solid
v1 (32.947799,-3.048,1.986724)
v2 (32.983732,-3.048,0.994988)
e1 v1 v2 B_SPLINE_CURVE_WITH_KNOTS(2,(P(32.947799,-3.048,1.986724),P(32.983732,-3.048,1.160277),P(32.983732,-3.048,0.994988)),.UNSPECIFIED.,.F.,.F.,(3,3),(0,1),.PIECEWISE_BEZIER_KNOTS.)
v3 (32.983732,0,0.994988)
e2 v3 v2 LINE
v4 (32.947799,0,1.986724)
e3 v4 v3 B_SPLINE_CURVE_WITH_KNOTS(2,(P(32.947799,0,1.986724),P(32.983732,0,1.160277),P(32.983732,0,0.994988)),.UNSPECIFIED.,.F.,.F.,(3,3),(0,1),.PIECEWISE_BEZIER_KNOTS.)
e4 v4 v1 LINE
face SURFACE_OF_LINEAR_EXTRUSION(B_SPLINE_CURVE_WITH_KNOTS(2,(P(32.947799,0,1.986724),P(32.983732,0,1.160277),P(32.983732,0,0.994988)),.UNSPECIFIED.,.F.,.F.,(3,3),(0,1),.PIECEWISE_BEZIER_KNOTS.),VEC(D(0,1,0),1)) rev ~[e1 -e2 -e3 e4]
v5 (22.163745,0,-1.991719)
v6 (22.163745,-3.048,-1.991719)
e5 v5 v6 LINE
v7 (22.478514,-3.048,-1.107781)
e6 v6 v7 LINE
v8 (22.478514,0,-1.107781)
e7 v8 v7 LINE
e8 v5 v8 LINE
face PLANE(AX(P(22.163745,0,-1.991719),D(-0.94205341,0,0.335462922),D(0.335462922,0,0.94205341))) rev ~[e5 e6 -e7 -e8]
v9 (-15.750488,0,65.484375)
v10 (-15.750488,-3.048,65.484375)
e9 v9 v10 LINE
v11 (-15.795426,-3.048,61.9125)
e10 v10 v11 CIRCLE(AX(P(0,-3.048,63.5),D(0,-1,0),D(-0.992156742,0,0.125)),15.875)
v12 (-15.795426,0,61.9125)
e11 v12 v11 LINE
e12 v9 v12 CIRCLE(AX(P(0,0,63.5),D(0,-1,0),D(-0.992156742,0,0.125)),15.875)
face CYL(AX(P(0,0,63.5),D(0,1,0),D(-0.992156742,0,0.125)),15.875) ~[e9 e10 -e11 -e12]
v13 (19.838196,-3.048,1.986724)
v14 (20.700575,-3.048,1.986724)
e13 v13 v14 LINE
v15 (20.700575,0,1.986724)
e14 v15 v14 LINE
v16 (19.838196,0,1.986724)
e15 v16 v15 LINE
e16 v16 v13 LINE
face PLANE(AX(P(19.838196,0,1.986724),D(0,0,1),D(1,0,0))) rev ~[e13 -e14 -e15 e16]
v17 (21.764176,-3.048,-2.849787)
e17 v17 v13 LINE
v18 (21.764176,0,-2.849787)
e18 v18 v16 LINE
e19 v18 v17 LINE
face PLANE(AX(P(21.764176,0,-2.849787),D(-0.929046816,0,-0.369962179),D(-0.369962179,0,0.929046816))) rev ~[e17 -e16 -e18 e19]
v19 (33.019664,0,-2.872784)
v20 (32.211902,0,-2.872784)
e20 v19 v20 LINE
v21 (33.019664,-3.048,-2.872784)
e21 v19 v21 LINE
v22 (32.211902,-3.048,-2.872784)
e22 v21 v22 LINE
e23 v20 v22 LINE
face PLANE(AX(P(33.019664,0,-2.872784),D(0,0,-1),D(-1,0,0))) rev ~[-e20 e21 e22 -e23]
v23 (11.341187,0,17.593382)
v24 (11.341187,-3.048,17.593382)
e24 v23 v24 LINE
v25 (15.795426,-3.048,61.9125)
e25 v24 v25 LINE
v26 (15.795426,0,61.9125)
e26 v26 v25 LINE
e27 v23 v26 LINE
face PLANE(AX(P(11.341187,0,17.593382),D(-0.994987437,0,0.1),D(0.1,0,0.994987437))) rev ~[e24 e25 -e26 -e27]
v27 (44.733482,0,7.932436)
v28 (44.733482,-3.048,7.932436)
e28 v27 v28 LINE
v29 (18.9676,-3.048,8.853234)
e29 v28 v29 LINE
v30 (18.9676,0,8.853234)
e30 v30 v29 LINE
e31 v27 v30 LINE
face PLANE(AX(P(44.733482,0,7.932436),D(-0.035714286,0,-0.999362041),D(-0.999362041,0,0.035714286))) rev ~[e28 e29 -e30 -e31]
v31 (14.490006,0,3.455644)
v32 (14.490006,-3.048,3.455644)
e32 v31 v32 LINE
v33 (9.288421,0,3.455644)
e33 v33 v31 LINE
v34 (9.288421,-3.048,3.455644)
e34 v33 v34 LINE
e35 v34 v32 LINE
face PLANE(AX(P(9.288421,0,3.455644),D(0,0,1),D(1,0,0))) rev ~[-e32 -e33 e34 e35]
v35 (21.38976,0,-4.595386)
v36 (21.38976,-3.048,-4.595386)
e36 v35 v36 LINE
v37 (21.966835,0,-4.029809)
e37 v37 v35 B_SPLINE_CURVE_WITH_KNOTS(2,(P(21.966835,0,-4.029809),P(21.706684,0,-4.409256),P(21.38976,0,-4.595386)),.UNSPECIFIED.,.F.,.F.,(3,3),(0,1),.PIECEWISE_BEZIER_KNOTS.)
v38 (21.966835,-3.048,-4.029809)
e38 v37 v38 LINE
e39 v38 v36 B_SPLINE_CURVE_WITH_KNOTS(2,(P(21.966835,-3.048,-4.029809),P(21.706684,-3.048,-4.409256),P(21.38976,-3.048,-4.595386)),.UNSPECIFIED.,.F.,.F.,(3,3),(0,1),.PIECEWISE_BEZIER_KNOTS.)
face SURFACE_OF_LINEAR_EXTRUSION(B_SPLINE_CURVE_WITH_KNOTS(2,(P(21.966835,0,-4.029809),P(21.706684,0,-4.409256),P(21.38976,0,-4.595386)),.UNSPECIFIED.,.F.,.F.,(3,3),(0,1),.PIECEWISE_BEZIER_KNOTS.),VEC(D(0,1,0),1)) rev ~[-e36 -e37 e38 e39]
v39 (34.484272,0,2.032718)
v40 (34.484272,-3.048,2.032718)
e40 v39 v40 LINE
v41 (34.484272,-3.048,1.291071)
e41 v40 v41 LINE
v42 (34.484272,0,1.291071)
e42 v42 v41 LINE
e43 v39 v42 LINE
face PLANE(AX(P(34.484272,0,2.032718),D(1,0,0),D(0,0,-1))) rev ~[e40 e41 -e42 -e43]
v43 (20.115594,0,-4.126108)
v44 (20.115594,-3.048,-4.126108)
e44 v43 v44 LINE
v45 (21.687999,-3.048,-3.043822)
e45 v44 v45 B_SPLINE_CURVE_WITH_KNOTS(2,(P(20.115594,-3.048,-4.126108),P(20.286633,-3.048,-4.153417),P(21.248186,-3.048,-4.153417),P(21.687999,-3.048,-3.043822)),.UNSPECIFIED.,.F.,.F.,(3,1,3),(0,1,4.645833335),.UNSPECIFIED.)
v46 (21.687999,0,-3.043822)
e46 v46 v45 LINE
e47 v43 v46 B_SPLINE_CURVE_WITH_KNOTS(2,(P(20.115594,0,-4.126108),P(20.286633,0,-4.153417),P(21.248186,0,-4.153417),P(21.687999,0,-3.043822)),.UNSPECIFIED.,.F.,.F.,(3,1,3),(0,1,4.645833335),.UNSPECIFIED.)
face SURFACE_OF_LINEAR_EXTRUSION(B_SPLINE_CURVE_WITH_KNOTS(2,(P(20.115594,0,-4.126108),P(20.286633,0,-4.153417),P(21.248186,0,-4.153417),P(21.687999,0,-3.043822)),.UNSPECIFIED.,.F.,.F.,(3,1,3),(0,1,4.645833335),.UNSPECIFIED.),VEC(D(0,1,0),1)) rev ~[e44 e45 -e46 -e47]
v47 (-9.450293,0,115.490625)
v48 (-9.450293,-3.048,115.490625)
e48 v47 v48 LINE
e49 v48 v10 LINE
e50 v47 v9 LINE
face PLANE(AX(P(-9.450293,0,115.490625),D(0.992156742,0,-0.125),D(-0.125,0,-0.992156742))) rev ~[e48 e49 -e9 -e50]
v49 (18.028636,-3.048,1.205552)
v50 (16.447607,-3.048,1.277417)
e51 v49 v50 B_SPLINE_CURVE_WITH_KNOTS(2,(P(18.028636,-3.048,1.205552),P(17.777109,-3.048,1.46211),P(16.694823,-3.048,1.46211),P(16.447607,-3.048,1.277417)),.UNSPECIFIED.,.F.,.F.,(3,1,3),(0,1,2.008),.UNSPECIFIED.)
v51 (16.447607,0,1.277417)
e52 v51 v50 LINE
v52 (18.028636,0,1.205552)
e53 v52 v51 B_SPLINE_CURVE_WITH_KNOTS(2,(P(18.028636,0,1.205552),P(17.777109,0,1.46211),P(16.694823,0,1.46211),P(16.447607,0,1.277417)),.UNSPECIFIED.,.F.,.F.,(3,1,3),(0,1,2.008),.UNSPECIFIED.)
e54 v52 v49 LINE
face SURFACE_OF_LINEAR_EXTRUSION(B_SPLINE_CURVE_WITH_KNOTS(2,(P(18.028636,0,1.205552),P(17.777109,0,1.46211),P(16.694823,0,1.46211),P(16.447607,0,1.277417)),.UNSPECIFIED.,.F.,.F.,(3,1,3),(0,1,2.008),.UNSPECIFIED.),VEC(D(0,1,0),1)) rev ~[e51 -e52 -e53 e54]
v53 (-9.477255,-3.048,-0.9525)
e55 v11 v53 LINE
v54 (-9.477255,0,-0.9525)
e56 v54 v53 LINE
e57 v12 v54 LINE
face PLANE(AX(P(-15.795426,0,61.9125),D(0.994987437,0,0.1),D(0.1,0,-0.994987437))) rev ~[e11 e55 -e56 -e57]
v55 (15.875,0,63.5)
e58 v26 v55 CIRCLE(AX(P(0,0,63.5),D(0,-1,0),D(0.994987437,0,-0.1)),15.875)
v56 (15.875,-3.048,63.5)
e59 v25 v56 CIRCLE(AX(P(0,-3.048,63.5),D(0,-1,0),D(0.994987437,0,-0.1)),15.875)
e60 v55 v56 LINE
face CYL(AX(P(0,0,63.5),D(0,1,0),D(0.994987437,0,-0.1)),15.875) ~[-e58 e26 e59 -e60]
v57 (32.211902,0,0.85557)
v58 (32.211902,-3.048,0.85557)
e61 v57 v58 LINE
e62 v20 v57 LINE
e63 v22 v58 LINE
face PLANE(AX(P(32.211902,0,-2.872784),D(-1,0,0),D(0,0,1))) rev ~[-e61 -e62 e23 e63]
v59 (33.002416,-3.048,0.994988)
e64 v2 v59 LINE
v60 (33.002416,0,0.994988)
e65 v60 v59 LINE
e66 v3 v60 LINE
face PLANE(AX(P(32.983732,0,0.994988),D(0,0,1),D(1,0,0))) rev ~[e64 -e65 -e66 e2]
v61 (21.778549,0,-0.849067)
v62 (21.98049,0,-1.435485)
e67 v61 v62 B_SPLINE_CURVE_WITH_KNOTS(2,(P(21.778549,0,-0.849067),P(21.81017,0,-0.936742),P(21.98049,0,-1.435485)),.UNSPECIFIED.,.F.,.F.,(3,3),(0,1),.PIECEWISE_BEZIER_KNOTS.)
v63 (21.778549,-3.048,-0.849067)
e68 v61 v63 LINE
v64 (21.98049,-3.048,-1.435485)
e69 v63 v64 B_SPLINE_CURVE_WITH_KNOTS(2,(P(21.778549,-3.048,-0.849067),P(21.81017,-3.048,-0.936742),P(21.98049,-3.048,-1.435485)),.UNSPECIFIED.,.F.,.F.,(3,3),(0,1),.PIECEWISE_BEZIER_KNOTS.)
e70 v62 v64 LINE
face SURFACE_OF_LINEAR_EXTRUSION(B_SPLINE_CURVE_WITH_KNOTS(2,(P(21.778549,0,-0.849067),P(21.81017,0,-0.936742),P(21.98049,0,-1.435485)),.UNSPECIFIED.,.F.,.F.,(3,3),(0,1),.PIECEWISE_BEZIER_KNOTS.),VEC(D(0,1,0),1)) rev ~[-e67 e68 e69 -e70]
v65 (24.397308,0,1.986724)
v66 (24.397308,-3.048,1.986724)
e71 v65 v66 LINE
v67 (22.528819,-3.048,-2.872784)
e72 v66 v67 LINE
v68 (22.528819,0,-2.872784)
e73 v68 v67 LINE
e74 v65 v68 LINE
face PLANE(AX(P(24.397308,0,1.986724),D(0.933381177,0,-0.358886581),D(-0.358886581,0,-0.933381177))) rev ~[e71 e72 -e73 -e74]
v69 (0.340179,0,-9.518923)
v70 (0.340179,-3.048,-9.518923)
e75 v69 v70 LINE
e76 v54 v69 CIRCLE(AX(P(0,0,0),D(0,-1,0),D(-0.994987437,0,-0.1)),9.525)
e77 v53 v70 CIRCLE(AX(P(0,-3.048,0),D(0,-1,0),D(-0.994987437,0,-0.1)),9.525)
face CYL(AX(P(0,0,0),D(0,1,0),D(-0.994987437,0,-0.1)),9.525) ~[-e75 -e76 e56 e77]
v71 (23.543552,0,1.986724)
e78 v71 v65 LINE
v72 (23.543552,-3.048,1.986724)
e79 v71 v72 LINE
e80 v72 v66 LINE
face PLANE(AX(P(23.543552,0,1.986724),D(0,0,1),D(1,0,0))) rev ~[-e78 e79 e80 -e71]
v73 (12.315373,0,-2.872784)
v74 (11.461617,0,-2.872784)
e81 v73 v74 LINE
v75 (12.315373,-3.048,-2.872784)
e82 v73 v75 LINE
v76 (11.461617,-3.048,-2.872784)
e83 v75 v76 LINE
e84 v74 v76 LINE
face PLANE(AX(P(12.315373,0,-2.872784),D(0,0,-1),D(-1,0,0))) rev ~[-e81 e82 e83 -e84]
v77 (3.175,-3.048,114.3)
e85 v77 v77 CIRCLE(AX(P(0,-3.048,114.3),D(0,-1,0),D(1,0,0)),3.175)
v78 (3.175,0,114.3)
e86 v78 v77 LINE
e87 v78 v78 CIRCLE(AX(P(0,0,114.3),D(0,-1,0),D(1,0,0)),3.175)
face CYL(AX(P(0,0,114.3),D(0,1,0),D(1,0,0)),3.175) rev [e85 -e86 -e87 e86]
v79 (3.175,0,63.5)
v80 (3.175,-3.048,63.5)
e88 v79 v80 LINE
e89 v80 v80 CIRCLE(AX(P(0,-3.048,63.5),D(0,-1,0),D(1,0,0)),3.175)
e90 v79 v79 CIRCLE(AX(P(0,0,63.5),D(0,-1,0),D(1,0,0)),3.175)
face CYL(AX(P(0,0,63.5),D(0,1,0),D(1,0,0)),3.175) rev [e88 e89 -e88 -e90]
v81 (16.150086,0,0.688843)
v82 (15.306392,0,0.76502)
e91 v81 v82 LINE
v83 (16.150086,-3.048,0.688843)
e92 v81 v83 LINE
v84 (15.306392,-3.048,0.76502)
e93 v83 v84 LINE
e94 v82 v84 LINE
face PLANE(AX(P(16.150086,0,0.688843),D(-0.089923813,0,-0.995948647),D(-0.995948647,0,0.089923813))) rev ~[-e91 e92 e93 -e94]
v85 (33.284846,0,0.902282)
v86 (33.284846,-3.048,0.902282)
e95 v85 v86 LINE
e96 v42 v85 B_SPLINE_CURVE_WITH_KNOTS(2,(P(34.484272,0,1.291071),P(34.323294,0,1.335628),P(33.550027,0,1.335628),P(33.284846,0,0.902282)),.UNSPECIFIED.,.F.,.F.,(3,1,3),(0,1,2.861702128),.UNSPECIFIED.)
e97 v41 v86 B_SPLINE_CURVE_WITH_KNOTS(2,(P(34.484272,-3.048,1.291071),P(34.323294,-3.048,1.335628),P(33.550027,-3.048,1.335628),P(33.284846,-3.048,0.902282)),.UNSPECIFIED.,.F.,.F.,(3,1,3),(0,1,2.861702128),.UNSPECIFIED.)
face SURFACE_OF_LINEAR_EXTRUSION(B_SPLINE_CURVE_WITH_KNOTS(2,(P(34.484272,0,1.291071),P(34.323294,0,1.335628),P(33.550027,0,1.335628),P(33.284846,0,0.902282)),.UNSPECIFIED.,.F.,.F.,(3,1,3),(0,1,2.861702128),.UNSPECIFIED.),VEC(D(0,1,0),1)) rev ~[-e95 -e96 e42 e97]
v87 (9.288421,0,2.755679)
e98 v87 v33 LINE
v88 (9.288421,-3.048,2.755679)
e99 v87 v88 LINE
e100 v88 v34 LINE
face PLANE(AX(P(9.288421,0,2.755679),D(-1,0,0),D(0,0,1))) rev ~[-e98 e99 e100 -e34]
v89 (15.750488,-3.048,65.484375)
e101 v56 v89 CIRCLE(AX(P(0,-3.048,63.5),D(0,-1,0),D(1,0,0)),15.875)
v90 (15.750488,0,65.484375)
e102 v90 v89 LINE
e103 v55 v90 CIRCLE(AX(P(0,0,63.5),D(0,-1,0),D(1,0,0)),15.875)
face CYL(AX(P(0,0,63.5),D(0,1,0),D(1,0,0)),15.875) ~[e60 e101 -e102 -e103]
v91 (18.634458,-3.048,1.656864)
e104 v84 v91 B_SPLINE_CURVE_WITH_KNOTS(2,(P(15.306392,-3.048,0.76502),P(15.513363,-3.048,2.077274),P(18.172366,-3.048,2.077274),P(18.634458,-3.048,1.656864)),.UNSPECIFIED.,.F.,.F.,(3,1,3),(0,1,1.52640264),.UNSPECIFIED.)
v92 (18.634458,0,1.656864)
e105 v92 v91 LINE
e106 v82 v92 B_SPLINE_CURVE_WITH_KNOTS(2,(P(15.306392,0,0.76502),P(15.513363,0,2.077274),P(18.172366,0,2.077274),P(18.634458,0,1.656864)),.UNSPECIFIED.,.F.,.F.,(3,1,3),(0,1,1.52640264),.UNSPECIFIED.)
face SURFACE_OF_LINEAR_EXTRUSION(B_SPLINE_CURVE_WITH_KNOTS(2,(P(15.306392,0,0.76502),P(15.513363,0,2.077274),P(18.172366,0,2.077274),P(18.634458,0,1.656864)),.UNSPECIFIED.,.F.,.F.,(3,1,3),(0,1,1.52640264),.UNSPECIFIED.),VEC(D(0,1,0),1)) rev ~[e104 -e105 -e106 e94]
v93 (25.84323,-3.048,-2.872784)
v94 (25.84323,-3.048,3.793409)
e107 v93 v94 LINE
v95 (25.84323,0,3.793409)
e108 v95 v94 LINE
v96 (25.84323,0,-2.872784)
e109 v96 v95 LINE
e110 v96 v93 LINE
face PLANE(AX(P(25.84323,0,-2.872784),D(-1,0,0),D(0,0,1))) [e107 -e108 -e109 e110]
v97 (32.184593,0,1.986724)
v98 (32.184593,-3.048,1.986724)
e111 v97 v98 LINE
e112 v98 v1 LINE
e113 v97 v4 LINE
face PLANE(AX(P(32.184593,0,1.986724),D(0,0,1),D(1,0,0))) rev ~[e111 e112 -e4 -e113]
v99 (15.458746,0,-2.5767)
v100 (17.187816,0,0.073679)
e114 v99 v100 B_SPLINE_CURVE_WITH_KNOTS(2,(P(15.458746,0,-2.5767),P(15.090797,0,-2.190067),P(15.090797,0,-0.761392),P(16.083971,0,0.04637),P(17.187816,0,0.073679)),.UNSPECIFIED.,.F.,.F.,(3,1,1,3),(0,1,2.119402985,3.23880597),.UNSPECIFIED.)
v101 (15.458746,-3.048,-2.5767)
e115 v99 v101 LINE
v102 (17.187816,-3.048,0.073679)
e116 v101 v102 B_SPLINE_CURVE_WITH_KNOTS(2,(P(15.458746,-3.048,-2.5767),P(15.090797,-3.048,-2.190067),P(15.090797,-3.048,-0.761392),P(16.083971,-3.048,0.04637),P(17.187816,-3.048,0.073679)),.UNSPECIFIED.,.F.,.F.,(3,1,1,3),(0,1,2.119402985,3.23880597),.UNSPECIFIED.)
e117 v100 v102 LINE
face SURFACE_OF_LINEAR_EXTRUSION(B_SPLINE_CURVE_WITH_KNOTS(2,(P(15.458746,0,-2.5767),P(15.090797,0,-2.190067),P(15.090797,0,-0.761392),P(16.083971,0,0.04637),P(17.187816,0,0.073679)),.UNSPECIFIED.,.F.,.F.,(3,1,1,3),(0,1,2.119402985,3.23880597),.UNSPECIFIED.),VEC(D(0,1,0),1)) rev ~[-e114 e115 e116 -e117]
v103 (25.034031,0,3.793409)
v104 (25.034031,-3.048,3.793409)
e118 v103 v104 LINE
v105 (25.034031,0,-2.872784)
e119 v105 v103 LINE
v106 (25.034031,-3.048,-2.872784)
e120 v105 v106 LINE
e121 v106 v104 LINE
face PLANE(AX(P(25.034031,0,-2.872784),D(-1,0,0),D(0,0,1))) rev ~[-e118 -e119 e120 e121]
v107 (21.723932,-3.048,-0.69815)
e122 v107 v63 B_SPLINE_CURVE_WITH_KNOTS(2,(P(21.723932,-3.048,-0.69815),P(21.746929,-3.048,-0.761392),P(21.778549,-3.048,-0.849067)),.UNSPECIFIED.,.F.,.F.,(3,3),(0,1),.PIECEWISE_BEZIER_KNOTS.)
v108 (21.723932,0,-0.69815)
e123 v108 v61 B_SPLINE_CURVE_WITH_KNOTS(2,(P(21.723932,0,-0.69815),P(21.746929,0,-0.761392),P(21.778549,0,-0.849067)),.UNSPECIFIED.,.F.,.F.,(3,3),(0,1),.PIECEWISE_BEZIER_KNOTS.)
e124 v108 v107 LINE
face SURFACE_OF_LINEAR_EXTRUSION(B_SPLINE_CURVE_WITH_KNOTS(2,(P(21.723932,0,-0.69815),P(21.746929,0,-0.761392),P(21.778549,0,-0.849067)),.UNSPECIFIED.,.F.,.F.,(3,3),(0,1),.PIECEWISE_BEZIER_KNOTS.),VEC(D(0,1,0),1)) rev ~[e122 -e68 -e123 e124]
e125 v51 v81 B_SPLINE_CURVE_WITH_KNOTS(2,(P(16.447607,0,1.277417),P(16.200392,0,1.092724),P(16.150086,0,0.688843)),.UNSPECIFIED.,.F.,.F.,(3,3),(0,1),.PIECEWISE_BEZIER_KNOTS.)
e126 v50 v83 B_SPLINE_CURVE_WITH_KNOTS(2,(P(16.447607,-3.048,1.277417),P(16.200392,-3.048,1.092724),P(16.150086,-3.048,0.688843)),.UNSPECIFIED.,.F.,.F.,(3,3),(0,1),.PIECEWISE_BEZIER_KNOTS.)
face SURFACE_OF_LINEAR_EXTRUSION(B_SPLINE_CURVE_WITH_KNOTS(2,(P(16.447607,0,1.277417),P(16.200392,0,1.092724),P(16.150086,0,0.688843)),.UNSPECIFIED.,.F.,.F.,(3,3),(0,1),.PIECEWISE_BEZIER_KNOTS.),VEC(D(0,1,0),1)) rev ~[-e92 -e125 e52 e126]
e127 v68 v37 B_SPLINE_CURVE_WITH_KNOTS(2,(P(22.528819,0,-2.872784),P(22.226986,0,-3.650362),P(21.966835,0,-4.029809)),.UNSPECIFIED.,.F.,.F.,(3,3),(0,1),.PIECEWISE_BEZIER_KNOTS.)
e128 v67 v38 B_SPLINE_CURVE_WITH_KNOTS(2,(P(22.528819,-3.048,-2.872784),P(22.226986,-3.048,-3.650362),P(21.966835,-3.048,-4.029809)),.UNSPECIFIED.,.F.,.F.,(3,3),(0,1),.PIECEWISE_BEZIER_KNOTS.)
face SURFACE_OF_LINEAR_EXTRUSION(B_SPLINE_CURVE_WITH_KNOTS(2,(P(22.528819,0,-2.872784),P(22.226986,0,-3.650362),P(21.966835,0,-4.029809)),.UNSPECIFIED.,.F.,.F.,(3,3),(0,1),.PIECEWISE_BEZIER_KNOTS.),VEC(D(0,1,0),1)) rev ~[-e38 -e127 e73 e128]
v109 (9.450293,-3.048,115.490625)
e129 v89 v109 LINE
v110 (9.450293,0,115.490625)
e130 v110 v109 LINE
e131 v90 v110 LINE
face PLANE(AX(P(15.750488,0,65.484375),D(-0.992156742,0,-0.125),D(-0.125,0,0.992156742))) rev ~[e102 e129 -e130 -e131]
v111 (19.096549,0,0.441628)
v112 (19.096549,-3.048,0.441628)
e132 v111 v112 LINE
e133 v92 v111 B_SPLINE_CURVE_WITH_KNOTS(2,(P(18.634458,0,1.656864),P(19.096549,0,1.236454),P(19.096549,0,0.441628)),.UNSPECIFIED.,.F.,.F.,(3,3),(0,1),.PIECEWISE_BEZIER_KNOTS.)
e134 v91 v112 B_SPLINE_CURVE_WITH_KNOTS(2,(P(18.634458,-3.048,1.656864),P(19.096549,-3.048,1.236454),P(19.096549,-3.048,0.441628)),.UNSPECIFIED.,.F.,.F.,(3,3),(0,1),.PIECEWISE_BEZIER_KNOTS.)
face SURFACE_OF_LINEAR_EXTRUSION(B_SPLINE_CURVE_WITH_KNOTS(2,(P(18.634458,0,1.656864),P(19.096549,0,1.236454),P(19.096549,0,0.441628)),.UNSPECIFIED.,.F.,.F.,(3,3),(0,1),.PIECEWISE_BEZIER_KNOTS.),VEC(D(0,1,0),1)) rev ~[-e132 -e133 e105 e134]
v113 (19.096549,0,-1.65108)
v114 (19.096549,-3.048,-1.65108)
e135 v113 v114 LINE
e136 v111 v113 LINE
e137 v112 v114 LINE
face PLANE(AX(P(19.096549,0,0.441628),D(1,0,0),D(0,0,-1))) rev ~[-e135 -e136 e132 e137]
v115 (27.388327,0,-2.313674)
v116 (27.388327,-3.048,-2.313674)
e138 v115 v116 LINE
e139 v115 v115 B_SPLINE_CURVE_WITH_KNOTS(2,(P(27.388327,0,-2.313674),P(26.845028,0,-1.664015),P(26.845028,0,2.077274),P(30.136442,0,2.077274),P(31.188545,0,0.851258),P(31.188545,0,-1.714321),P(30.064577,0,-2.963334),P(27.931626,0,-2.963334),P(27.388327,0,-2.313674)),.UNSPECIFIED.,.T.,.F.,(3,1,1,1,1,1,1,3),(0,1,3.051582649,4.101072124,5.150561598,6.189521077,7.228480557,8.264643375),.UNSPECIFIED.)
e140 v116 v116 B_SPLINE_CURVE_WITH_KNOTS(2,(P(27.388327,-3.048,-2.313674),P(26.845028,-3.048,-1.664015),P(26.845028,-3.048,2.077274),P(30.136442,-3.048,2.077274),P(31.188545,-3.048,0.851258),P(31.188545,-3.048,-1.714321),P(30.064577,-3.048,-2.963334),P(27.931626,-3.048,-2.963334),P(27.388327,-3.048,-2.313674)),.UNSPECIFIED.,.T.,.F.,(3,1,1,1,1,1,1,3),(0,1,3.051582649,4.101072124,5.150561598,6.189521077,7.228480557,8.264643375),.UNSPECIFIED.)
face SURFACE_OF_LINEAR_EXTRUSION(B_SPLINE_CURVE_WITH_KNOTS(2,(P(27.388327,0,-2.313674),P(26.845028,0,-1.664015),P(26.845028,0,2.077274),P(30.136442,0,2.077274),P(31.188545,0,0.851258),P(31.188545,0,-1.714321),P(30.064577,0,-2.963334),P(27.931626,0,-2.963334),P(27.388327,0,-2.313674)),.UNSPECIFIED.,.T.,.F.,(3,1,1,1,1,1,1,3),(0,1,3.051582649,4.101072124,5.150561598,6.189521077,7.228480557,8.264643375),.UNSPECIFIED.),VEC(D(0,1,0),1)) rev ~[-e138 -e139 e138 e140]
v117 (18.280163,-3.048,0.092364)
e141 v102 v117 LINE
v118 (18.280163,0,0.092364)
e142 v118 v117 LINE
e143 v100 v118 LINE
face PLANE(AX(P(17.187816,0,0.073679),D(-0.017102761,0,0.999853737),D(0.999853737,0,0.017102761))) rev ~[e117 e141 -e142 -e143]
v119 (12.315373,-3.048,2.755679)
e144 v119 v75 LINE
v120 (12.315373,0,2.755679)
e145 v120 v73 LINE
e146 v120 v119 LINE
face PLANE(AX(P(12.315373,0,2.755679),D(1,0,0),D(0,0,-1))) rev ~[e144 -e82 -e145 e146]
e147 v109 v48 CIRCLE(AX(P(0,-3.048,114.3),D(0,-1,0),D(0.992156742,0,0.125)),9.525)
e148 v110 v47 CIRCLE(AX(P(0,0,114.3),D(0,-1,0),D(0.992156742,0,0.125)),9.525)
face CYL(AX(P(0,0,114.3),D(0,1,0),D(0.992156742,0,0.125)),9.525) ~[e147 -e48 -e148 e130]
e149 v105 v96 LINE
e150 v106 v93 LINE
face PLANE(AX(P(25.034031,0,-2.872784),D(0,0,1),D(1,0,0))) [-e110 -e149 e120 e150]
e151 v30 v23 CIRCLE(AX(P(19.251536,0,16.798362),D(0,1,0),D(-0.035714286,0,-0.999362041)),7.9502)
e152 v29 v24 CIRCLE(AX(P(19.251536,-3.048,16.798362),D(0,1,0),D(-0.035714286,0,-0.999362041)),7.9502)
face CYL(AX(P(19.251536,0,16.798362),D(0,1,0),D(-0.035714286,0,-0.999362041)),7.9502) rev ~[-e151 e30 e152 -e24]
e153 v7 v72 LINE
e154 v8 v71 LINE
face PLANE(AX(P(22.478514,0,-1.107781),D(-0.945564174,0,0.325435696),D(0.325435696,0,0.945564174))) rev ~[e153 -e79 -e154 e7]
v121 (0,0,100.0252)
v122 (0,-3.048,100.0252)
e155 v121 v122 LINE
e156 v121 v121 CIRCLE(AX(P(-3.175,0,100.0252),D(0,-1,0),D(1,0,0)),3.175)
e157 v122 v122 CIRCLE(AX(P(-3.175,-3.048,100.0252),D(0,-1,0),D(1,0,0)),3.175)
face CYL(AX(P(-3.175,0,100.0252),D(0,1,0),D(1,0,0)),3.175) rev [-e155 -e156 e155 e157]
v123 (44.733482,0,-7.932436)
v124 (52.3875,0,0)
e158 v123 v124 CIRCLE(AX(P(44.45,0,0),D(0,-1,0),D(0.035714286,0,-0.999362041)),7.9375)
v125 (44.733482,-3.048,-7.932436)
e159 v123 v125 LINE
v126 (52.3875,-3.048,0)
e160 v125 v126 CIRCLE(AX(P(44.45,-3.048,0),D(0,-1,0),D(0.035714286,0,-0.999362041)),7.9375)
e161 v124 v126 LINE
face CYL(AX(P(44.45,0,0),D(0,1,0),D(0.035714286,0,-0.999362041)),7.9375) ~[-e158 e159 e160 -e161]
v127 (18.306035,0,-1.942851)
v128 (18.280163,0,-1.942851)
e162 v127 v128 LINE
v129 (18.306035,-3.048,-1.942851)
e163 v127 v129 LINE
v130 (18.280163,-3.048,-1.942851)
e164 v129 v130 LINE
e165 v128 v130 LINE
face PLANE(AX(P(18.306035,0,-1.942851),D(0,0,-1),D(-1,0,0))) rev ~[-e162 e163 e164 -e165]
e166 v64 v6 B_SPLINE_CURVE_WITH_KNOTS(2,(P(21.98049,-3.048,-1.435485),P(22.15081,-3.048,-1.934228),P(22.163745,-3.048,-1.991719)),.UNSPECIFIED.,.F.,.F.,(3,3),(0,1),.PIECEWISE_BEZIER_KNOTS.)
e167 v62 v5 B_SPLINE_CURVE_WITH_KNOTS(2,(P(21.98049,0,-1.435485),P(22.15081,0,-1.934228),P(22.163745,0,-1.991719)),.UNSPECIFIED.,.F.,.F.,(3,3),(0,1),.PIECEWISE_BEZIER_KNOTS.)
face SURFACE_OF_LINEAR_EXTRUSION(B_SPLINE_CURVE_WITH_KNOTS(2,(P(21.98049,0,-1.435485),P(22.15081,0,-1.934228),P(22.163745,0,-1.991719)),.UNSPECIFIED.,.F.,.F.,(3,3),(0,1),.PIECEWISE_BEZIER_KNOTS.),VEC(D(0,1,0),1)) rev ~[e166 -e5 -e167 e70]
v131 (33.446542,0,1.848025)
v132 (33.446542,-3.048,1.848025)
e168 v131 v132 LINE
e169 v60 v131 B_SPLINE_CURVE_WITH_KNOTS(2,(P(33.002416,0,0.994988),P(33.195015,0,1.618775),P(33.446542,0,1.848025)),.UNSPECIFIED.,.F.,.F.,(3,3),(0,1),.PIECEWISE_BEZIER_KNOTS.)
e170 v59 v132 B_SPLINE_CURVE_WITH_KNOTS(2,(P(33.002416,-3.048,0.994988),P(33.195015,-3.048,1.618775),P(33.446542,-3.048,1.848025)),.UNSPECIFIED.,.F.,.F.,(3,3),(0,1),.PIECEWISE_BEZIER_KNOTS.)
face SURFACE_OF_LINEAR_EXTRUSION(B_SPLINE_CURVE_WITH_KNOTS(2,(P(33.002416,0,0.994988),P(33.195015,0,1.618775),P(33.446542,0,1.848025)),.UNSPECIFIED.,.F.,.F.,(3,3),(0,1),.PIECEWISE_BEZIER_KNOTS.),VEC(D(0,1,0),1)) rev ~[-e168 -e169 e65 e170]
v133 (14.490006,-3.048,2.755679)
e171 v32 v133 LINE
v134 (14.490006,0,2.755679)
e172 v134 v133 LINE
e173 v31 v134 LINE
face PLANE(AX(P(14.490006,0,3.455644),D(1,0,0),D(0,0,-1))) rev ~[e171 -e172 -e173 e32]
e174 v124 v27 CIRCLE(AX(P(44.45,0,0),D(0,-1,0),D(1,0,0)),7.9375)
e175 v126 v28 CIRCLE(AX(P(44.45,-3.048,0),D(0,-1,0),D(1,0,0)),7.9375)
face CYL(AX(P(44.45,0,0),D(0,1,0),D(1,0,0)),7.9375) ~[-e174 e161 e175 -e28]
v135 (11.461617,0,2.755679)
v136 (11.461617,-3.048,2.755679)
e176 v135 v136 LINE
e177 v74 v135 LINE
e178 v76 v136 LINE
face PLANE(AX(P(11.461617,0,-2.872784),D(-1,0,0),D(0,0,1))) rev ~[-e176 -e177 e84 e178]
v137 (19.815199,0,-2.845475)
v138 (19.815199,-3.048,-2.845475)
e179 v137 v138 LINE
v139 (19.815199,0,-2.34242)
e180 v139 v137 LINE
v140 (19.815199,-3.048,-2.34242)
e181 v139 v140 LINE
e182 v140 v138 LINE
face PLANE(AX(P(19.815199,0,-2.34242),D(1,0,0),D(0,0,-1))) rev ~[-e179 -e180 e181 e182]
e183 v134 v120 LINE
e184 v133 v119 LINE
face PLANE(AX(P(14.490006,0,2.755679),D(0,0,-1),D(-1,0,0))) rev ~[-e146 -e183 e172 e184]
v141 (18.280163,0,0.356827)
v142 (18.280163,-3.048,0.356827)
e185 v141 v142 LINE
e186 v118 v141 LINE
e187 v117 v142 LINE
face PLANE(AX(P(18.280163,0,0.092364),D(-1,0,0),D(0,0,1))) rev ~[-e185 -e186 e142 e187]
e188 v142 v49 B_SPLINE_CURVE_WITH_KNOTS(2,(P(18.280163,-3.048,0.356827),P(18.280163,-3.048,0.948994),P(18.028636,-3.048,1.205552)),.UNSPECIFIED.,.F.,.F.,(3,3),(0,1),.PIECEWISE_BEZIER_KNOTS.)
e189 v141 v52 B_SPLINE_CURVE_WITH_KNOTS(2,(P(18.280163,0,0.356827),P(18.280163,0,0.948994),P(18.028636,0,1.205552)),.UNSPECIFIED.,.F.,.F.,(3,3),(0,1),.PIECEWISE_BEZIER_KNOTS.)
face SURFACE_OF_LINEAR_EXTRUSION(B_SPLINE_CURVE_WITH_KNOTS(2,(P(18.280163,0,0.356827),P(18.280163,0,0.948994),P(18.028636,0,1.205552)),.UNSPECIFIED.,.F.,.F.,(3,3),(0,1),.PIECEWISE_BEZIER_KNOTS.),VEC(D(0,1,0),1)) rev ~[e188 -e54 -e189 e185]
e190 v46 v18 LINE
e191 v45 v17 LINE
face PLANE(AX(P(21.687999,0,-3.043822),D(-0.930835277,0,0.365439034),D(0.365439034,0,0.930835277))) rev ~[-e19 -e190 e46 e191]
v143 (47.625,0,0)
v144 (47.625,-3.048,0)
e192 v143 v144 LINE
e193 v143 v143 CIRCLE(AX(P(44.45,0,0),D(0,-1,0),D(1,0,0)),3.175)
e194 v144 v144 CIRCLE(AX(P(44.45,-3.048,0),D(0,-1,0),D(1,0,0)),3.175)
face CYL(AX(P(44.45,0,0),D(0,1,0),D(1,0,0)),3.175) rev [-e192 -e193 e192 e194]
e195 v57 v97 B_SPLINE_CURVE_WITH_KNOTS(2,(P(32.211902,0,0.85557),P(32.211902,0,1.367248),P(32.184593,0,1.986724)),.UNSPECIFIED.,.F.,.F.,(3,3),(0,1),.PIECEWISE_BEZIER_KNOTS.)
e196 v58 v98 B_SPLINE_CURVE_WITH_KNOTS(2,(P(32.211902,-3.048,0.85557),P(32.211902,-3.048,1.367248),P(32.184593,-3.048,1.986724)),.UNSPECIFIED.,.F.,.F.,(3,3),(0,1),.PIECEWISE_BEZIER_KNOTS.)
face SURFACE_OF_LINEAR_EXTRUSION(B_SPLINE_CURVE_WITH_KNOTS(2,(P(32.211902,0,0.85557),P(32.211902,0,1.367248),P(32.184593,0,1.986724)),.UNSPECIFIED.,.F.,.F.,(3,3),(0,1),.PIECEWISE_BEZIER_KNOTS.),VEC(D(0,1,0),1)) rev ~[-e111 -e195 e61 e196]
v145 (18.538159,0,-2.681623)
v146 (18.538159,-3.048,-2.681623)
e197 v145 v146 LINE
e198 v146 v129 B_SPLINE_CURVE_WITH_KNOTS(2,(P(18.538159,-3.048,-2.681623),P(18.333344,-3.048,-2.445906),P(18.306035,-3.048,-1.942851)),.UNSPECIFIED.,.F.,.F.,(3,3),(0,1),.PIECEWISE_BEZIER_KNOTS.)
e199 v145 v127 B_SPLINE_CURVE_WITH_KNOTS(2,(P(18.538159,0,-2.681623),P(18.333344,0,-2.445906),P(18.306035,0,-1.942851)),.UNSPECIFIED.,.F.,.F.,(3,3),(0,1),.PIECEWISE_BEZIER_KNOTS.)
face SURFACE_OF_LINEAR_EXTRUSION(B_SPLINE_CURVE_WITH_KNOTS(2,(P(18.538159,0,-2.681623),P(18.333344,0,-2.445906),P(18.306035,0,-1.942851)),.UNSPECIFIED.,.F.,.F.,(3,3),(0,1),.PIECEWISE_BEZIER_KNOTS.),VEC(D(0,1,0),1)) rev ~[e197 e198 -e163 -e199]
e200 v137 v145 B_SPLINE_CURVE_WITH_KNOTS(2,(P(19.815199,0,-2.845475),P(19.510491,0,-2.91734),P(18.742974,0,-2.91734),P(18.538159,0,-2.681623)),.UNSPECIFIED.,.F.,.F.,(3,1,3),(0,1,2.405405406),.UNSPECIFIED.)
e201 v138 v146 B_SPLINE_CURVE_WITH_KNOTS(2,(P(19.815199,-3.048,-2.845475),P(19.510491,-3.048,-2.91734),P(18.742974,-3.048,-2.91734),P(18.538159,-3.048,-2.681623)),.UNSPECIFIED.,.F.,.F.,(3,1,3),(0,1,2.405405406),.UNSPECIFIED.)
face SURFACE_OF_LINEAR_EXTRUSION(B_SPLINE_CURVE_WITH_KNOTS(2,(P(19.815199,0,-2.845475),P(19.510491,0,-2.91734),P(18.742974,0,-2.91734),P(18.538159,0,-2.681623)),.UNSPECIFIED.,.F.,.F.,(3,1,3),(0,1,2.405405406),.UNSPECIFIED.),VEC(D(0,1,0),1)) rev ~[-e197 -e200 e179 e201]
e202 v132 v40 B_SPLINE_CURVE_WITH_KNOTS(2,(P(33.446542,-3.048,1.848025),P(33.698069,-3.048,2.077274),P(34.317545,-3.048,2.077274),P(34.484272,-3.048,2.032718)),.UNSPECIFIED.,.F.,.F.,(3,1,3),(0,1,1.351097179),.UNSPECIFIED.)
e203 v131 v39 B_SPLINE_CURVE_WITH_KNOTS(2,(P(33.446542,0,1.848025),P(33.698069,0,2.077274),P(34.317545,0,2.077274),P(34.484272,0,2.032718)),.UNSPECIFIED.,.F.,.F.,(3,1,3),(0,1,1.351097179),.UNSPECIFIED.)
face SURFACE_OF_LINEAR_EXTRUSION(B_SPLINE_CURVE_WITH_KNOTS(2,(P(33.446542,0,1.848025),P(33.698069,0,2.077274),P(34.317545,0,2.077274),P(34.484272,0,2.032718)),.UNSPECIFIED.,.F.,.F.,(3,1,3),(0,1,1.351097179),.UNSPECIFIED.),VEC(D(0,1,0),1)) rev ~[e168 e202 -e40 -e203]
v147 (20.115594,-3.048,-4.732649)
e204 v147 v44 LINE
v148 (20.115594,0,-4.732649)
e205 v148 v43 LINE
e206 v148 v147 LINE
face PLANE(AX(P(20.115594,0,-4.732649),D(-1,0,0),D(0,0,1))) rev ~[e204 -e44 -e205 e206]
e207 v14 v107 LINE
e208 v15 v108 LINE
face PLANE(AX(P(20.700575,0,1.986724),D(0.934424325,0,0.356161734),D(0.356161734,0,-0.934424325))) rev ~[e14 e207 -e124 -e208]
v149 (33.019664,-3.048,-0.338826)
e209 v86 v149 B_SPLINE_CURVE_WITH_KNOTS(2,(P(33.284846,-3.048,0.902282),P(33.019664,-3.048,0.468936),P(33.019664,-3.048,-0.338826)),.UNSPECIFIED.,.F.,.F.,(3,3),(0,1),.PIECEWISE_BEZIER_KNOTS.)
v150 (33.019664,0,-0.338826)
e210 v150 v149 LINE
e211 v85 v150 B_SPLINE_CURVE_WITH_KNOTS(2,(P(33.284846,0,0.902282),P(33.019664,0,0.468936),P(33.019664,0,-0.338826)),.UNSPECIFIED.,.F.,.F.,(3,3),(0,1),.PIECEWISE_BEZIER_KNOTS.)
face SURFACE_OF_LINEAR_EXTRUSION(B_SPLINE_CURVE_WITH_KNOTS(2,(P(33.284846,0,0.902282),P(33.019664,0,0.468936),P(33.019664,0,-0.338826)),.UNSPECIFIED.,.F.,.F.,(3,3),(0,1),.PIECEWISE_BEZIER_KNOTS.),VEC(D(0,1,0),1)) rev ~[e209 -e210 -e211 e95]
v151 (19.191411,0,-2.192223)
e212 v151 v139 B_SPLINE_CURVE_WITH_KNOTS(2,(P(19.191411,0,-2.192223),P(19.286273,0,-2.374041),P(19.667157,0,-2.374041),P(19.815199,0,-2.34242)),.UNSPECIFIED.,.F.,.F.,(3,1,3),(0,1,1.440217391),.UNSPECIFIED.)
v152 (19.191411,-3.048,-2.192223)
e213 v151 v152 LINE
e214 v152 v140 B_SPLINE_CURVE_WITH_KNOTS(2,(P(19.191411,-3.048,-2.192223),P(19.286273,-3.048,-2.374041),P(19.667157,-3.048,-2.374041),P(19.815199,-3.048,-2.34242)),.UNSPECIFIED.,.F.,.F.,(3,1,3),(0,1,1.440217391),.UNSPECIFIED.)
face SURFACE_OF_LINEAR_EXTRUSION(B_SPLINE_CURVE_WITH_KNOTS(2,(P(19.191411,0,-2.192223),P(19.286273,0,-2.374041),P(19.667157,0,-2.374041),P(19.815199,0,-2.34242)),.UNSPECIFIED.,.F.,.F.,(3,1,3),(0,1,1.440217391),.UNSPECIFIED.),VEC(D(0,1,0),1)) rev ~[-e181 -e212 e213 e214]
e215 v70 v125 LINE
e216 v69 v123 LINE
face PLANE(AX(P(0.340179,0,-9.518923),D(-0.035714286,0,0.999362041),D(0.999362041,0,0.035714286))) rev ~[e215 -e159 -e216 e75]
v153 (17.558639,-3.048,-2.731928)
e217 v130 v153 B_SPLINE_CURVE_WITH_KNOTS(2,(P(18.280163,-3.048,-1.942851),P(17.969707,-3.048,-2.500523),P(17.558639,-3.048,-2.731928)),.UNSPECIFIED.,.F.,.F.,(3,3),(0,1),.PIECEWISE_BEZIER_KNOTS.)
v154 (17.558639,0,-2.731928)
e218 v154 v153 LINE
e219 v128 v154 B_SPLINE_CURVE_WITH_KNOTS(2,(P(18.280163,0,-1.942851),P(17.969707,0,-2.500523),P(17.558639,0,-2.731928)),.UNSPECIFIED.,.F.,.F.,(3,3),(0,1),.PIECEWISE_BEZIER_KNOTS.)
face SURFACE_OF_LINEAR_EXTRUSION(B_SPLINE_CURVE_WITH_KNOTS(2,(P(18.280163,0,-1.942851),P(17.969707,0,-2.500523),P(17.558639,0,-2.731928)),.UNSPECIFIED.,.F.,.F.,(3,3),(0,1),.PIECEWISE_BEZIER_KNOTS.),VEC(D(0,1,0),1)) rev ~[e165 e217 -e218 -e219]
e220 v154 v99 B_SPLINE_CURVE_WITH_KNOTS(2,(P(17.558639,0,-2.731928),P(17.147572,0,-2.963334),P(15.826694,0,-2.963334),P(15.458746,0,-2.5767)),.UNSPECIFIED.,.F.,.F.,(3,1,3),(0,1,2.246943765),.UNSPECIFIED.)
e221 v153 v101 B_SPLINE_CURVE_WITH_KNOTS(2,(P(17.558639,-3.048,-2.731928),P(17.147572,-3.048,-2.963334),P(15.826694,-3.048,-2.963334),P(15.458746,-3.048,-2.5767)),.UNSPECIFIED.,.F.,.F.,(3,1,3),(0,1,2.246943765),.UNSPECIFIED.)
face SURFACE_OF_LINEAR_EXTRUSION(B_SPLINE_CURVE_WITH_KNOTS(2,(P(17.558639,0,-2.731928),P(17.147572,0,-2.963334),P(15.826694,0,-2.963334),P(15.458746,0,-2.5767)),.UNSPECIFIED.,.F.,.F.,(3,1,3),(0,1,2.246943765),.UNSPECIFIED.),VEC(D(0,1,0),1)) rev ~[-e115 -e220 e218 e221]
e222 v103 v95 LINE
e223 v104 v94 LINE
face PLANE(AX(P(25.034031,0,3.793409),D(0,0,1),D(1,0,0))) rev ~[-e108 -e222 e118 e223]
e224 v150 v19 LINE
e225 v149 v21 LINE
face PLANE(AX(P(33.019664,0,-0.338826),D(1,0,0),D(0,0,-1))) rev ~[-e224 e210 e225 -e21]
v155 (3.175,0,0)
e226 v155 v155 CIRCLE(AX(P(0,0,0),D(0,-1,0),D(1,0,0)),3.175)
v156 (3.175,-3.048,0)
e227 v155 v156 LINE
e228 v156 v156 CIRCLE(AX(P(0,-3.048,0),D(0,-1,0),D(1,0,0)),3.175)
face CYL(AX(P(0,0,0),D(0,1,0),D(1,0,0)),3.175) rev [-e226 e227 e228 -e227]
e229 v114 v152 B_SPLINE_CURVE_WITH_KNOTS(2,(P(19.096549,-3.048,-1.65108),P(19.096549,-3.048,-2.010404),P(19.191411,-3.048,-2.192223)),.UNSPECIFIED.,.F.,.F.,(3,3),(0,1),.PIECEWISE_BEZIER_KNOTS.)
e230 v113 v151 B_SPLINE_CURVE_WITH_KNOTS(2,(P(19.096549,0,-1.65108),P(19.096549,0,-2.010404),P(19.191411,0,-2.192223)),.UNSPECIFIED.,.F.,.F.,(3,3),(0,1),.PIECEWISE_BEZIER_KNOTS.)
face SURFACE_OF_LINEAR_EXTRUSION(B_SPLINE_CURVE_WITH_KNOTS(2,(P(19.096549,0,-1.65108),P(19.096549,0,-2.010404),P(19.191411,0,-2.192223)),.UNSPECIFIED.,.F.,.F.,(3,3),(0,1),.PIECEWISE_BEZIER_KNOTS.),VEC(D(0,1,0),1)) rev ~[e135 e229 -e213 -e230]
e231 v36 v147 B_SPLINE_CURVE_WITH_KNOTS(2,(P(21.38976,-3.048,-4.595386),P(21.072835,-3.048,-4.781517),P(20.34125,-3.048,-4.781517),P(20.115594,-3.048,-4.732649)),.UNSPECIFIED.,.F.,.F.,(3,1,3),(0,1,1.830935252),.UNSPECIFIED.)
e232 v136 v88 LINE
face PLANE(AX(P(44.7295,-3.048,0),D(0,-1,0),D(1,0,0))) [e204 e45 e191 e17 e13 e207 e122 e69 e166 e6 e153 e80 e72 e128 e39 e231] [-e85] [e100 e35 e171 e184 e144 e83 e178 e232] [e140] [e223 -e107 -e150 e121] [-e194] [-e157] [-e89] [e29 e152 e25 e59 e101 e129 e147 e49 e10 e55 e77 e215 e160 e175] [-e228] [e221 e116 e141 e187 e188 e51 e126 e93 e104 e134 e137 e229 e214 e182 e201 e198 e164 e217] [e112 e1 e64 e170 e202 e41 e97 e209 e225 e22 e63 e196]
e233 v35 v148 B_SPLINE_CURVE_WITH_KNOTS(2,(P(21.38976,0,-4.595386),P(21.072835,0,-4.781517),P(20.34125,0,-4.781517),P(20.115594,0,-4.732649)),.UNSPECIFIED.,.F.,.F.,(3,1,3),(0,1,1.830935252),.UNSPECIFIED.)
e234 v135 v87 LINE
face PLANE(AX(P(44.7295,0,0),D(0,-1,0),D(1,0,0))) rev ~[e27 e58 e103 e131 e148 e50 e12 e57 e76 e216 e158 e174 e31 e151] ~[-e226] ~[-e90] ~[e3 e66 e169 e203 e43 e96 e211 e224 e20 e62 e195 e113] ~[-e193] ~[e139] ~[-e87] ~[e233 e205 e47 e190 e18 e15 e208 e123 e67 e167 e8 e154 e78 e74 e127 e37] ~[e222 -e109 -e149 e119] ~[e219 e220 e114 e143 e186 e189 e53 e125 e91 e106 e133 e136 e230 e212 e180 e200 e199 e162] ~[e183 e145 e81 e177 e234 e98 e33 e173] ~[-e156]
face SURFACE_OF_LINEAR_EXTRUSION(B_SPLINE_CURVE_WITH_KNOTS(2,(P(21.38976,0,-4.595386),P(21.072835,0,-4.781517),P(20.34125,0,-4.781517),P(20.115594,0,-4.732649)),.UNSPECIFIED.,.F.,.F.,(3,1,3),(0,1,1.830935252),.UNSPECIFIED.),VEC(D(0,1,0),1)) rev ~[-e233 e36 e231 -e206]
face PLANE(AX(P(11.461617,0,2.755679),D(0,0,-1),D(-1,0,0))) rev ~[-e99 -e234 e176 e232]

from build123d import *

# Parameters (mm, degrees)
F0_R     = 3.175
F0_W     = 0.8091993024
F0_H     = 6.6661924771
F1_DEPTH = 3.048


with BuildPart() as f1:
    # F0 (on Front) → F1 (new body)
    with BuildSketch(Plane.XZ):
        with BuildLine():
            ThreePointArc((44.7334821429, -7.9324362036), (50.1620069047, -5.5115227815), (52.3875, 0))
            ThreePointArc((52.3875, 0), (50.1620069047, 5.5115227815), (44.7334821429, 7.9324362036))
            ThreePointArc((44.7334821429, 7.9324362036), (36.5125, 0), (44.7334821429, -7.9324362036))
        make_face()
        with Locations((44.45, 0)):
            Circle(F0_R, mode=Mode.SUBTRACT)
        with BuildLine():
            ThreePointArc((44.7334821429, -7.9324362036), (36.5125, 0), (44.7334821429, 7.9324362036))
            Line((44.7334821429, 7.9324362036), (18.9676000005, 8.8532337108))
            ThreePointArc((18.9676000005, 8.8532337108), (13.2611998974, 11.5713591498), (11.3411865923, 17.5933818124))
            Line((11.3411865923, 17.5933818124), (15.7954255641, 61.9125))
            ThreePointArc((15.7954255641, 61.9125), (0, 47.625), (-15.7954255641, 61.9125))
            Line((-15.7954255641, 61.9125), (-9.4772553384, -0.9525))
            ThreePointArc((-9.4772553384, -0.9525), (-0.4768479324, 9.5130563464), (9.525, 0))
            ThreePointArc((9.525, 0), (6.8544082857, -6.6138273378), (0.3401785714, -9.5189234444))
            Line((0.3401785714, -9.5189234444), (44.7334821429, -7.9324362036))
        make_face()
        Polygon((14.4900061593, 2.7556789248), (12.3153728652, 2.7556789248), (12.3153728652, -2.8727837186), (11.4616172957, -2.8727837186), (11.4616172957, 2.7556789248), (9.2884213006, 2.7556789248), (9.2884213006, 3.4556435079), (14.4900061593, 3.4556435079), align=None, mode=Mode.SUBTRACT)
        with BuildLine():
            add(Edge.make_bspline(
                [(17.5586393932, -2.7319284226), (17.1475718967, -2.9633335517), (16.5597166308, -2.9633335517)],
                knots=[0, 0, 0, 1, 1, 1], degree=2))
            add(Edge.make_bspline(
                [(16.5597166308, -2.9633335517), (15.8266941722, -2.9633335517), (15.4587456439, -2.5767001373)],
                knots=[0, 0, 0, 1, 1, 1], degree=2))
            add(Edge.make_bspline(
                [(15.4587456439, -2.5767001373), (15.0907971156, -2.1900667228), (15.0907971156, -1.5159735206)],
                knots=[0, 0, 0, 1, 1, 1], degree=2))
            add(Edge.make_bspline(
                [(15.0907971156, -1.5159735206), (15.0907971156, -0.7613915778), (15.5873838989, -0.3575105761)],
                knots=[0, 0, 0, 1, 1, 1], degree=2))
            add(Edge.make_bspline(
                [(15.5873838989, -0.3575105761), (16.0839706822, 0.0463704256), (17.187816267, 0.0736791055)],
                knots=[0, 0, 0, 1, 1, 1], degree=2))
            Line((17.187816267, 0.0736791055), (18.2801634603, 0.0923639917))
            Line((18.2801634603, 0.0923639917), (18.2801634603, 0.3568269964))
            add(Edge.make_bspline(
                [(18.2801634603, 0.3568269964), (18.2801634603, 0.9489941591), (18.0286361461, 1.2055520196)],
                knots=[0, 0, 0, 1, 1, 1], degree=2))
            add(Edge.make_bspline(
                [(18.0286361461, 1.2055520196), (17.7771088318, 1.4621098801), (17.2381217298, 1.4621098801)],
                knots=[0, 0, 0, 1, 1, 1], degree=2))
            add(Edge.make_bspline(
                [(17.2381217298, 1.4621098801), (16.6948227311, 1.4621098801), (16.4476073136, 1.2774169665)],
                knots=[0, 0, 0, 1, 1, 1], degree=2))
            add(Edge.make_bspline(
                [(16.4476073136, 1.2774169665), (16.2003918962, 1.0927240529), (16.1500864334, 0.6888430512)],
                knots=[0, 0, 0, 1, 1, 1], degree=2))
            Line((16.1500864334, 0.6888430512), (15.3063919564, 0.7650198949))
            add(Edge.make_bspline(
                [(15.3063919564, 0.7650198949), (15.5133630036, 2.0772738258), (17.2553693171, 2.0772738258)],
                knots=[0, 0, 0, 1, 1, 1], degree=2))
            add(Edge.make_bspline(
                [(17.2553693171, 2.0772738258), (18.1723660399, 2.0772738258), (18.6344576487, 1.6568638863)],
                knots=[0, 0, 0, 1, 1, 1], degree=2))
            add(Edge.make_bspline(
                [(18.6344576487, 1.6568638863), (19.0965492574, 1.2364539468), (19.0965492574, 0.4416276337)],
                knots=[0, 0, 0, 1, 1, 1], degree=2))
            Line((19.0965492574, 0.4416276337), (19.0965492574, -1.6510796208))
            add(Edge.make_bspline(
                [(19.0965492574, -1.6510796208), (19.0965492574, -2.0104043555), (19.1914109874, -2.1922226712)],
                knots=[0, 0, 0, 1, 1, 1], degree=2))
            add(Edge.make_bspline(
                [(19.1914109874, -2.1922226712), (19.2862727173, -2.3740409869), (19.550735722, -2.3740409869)],
                knots=[0, 0, 0, 1, 1, 1], degree=2))
            add(Edge.make_bspline(
                [(19.550735722, -2.3740409869), (19.667156936, -2.3740409869), (19.8151987267, -2.3424204103)],
                knots=[0, 0, 0, 1, 1, 1], degree=2))
            Line((19.8151987267, -2.3424204103), (19.8151987267, -2.8454750388))
            add(Edge.make_bspline(
                [(19.8151987267, -2.8454750388), (19.5104913517, -2.9173399857), (19.1914109874, -2.9173399857)],
                knots=[0, 0, 0, 1, 1, 1], degree=2))
            add(Edge.make_bspline(
                [(19.1914109874, -2.9173399857), (18.7429737185, -2.9173399857), (18.5381586198, -2.6816229598)],
                knots=[0, 0, 0, 1, 1, 1], degree=2))
            add(Edge.make_bspline(
                [(18.5381586198, -2.6816229598), (18.333343521, -2.4459059338), (18.3060348412, -1.9428513053)],
                knots=[0, 0, 0, 1, 1, 1], degree=2))
            Line((18.3060348412, -1.9428513053), (18.2801634603, -1.9428513053))
            add(Edge.make_bspline(
                [(18.2801634603, -1.9428513053), (17.9697068896, -2.5005232935), (17.5586393932, -2.7319284226)],
                knots=[0, 0, 0, 1, 1, 1], degree=2))
        make_face(mode=Mode.SUBTRACT)
        with BuildLine():
            add(Edge.make_bspline(
                [(21.3897597139, -4.5953864965), (21.072835298, -4.781516709), (20.673266193, -4.781516709)],
                knots=[0, 0, 0, 1, 1, 1], degree=2))
            add(Edge.make_bspline(
                [(20.673266193, -4.781516709), (20.3412501382, -4.781516709), (20.1155942049, -4.7326485451)],
                knots=[0, 0, 0, 1, 1, 1], degree=2))
            Line((20.1155942049, -4.7326485451), (20.1155942049, -4.126108393))
            add(Edge.make_bspline(
                [(20.1155942049, -4.126108393), (20.2866327786, -4.1534170729), (20.4936038257, -4.1534170729)],
                knots=[0, 0, 0, 1, 1, 1], degree=2))
            add(Edge.make_bspline(
                [(20.4936038257, -4.1534170729), (21.2481857685, -4.1534170729), (21.6879992437, -3.0438222923)],
                knots=[0, 0, 0, 1, 1, 1], degree=2))
            Line((21.6879992437, -3.0438222923), (21.7641760874, -2.8497869356))
            Line((21.7641760874, -2.8497869356), (19.8381955097, 1.9867239927))
            Line((19.8381955097, 1.9867239927), (20.7005748729, 1.9867239927))
            Line((20.7005748729, 1.9867239927), (21.7239317171, -0.6981504245))
            add(Edge.make_bspline(
                [(21.7239317171, -0.6981504245), (21.7469285001, -0.7613915778), (21.7785490768, -0.8490668131)],
                knots=[0, 0, 0, 1, 1, 1], degree=2))
            add(Edge.make_bspline(
                [(21.7785490768, -0.8490668131), (21.8101696534, -0.9367420483), (21.9804895777, -1.43548478)],
                knots=[0, 0, 0, 1, 1, 1], degree=2))
            add(Edge.make_bspline(
                [(21.9804895777, -1.43548478), (22.1508095019, -1.9342275117), (22.1637451923, -1.9917194693)],
                knots=[0, 0, 0, 1, 1, 1], degree=2))
            Line((22.1637451923, -1.9917194693), (22.4785136599, -1.107780622))
            Line((22.4785136599, -1.107780622), (23.5435521734, 1.9867239927))
            Line((23.5435521734, 1.9867239927), (24.3973077429, 1.9867239927))
            Line((24.3973077429, 1.9867239927), (22.5288191227, -2.8727837186))
            add(Edge.make_bspline(
                [(22.5288191227, -2.8727837186), (22.2269863456, -3.6503624444), (21.9668352377, -4.0298093641)],
                knots=[0, 0, 0, 1, 1, 1], degree=2))
            add(Edge.make_bspline(
                [(21.9668352377, -4.0298093641), (21.7066841299, -4.4092562839), (21.3897597139, -4.5953864965)],
                knots=[0, 0, 0, 1, 1, 1], degree=2))
        make_face(mode=Mode.SUBTRACT)
        with Locations((25.4386308239, 0.4603125199)):
            Rectangle(F0_W, F0_H, mode=Mode.SUBTRACT)
        with BuildLine():
            add(Edge.make_bspline(
                [(30.6624938161, 1.4642658285), (31.1885452276, 0.8512578312), (31.1885452276, -0.4379993167)],
                knots=[0, 0, 0, 1, 1, 1], degree=2))
            add(Edge.make_bspline(
                [(31.1885452276, -0.4379993167), (31.1885452276, -1.7143207741), (30.6265613426, -2.3388271629)],
                knots=[0, 0, 0, 1, 1, 1], degree=2))
            add(Edge.make_bspline(
                [(30.6265613426, -2.3388271629), (30.0645774576, -2.9633335517), (28.9966643463, -2.9633335517)],
                knots=[0, 0, 0, 1, 1, 1], degree=2))
            add(Edge.make_bspline(
                [(28.9966643463, -2.9633335517), (27.9316258328, -2.9633335517), (27.388326834, -2.3136744315)],
                knots=[0, 0, 0, 1, 1, 1], degree=2))
            add(Edge.make_bspline(
                [(27.388326834, -2.3136744315), (26.8450278353, -1.6640153113), (26.8450278353, -0.4379993167)],
                knots=[0, 0, 0, 1, 1, 1], degree=2))
            add(Edge.make_bspline(
                [(26.8450278353, -0.4379993167), (26.8450278353, 2.0772738258), (29.0225357272, 2.0772738258)],
                knots=[0, 0, 0, 1, 1, 1], degree=2))
            add(Edge.make_bspline(
                [(29.0225357272, 2.0772738258), (30.1364424046, 2.0772738258), (30.6624938161, 1.4642658285)],
                knots=[0, 0, 0, 1, 1, 1], degree=2))
        make_face(mode=Mode.SUBTRACT)
        with BuildLine():
            Line((33.0196640753, -2.8727837186), (32.2119020719, -2.8727837186))
            Line((32.2119020719, -2.8727837186), (32.2119020719, 0.8555697281))
            add(Edge.make_bspline(
                [(32.2119020719, 0.8555697281), (32.2119020719, 1.3672481502), (32.184593392, 1.9867239927)],
                knots=[0, 0, 0, 1, 1, 1], degree=2))
            Line((32.184593392, 1.9867239927), (32.9477991284, 1.9867239927))
            add(Edge.make_bspline(
                [(32.9477991284, 1.9867239927), (32.9837316019, 1.160277103), (32.9837316019, 0.9949877251)],
                knots=[0, 0, 0, 1, 1, 1], degree=2))
            Line((32.9837316019, 0.9949877251), (33.0024164881, 0.9949877251))
            add(Edge.make_bspline(
                [(33.0024164881, 0.9949877251), (33.1950145459, 1.6187754644), (33.4465418601, 1.8480246451)],
                knots=[0, 0, 0, 1, 1, 1], degree=2))
            add(Edge.make_bspline(
                [(33.4465418601, 1.8480246451), (33.6980691744, 2.0772738258), (34.1565675358, 2.0772738258)],
                knots=[0, 0, 0, 1, 1, 1], degree=2))
            add(Edge.make_bspline(
                [(34.1565675358, 2.0772738258), (34.3175450169, 2.0772738258), (34.4842716938, 2.0327175587)],
                knots=[0, 0, 0, 1, 1, 1], degree=2))
            Line((34.4842716938, 2.0327175587), (34.4842716938, 1.2910713064))
            add(Edge.make_bspline(
                [(34.4842716938, 1.2910713064), (34.3232942126, 1.3356275735), (34.0530820122, 1.3356275735)],
                knots=[0, 0, 0, 1, 1, 1], degree=2))
            add(Edge.make_bspline(
                [(34.0530820122, 1.3356275735), (33.5500273837, 1.3356275735), (33.2848457295, 0.9022819436)],
                knots=[0, 0, 0, 1, 1, 1], degree=2))
            add(Edge.make_bspline(
                [(33.2848457295, 0.9022819436), (33.0196640753, 0.4689363136), (33.0196640753, -0.3388256899)],
                knots=[0, 0, 0, 1, 1, 1], degree=2))
            Line((33.0196640753, -0.3388256899), (33.0196640753, -2.8727837186))
        make_face(mode=Mode.SUBTRACT)
        with BuildLine():
            ThreePointArc((-9.4772553384, -0.9525), (-6.2623833816, -7.1769199091), (0.3401785714, -9.5189234444))
            ThreePointArc((0.3401785714, -9.5189234444), (6.8544082857, -6.6138273378), (9.525, 0))
            ThreePointArc((9.525, 0), (-0.4768479324, 9.5130563464), (-9.4772553384, -0.9525))
        make_face()
        Circle(F0_R, mode=Mode.SUBTRACT)
        with BuildLine():
            ThreePointArc((-15.7954255641, 61.9125), (0, 47.625), (15.7954255641, 61.9125))
            ThreePointArc((15.7954255641, 61.9125), (15.8550939106, 62.7052534459), (15.875, 63.5))
            ThreePointArc((15.875, 63.5), (15.8438414904, 64.4941387366), (15.7504882737, 65.484375))
            ThreePointArc((15.7504882737, 65.484375), (0, 79.375), (-15.7504882737, 65.484375))
            ThreePointArc((-15.7504882737, 65.484375), (-15.8737438155, 63.6997054867), (-15.7954255641, 61.9125))
        make_face()
        with Locations((0, 63.5)):
            Circle(F0_R, mode=Mode.SUBTRACT)
        with BuildLine():
            Line((-9.4502929642, 115.490625), (-15.7504882737, 65.484375))
            ThreePointArc((-15.7504882737, 65.484375), (0, 79.375), (15.7504882737, 65.484375))
            Line((15.7504882737, 65.484375), (9.4502929642, 115.490625))
            ThreePointArc((9.4502929642, 115.490625), (9.5063048942, 114.896483242), (9.525, 114.3))
            ThreePointArc((9.525, 114.3), (-0.596483242, 104.7936951058), (-9.4502929642, 115.490625))
        make_face()
        with Locations((-3.175, 100.0252)):
            Circle(F0_R, mode=Mode.SUBTRACT)
        with BuildLine():
            ThreePointArc((9.4502929642, 115.490625), (0, 123.825), (-9.4502929642, 115.490625))
            ThreePointArc((-9.4502929642, 115.490625), (-0.596483242, 104.7936951058), (9.525, 114.3))
            ThreePointArc((9.525, 114.3), (9.5063048942, 114.896483242), (9.4502929642, 115.490625))
        make_face()
        with Locations((0, 114.3)):
            Circle(F0_R, mode=Mode.SUBTRACT)
    extrude(amount=F1_DEPTH)


solid = f1.part
